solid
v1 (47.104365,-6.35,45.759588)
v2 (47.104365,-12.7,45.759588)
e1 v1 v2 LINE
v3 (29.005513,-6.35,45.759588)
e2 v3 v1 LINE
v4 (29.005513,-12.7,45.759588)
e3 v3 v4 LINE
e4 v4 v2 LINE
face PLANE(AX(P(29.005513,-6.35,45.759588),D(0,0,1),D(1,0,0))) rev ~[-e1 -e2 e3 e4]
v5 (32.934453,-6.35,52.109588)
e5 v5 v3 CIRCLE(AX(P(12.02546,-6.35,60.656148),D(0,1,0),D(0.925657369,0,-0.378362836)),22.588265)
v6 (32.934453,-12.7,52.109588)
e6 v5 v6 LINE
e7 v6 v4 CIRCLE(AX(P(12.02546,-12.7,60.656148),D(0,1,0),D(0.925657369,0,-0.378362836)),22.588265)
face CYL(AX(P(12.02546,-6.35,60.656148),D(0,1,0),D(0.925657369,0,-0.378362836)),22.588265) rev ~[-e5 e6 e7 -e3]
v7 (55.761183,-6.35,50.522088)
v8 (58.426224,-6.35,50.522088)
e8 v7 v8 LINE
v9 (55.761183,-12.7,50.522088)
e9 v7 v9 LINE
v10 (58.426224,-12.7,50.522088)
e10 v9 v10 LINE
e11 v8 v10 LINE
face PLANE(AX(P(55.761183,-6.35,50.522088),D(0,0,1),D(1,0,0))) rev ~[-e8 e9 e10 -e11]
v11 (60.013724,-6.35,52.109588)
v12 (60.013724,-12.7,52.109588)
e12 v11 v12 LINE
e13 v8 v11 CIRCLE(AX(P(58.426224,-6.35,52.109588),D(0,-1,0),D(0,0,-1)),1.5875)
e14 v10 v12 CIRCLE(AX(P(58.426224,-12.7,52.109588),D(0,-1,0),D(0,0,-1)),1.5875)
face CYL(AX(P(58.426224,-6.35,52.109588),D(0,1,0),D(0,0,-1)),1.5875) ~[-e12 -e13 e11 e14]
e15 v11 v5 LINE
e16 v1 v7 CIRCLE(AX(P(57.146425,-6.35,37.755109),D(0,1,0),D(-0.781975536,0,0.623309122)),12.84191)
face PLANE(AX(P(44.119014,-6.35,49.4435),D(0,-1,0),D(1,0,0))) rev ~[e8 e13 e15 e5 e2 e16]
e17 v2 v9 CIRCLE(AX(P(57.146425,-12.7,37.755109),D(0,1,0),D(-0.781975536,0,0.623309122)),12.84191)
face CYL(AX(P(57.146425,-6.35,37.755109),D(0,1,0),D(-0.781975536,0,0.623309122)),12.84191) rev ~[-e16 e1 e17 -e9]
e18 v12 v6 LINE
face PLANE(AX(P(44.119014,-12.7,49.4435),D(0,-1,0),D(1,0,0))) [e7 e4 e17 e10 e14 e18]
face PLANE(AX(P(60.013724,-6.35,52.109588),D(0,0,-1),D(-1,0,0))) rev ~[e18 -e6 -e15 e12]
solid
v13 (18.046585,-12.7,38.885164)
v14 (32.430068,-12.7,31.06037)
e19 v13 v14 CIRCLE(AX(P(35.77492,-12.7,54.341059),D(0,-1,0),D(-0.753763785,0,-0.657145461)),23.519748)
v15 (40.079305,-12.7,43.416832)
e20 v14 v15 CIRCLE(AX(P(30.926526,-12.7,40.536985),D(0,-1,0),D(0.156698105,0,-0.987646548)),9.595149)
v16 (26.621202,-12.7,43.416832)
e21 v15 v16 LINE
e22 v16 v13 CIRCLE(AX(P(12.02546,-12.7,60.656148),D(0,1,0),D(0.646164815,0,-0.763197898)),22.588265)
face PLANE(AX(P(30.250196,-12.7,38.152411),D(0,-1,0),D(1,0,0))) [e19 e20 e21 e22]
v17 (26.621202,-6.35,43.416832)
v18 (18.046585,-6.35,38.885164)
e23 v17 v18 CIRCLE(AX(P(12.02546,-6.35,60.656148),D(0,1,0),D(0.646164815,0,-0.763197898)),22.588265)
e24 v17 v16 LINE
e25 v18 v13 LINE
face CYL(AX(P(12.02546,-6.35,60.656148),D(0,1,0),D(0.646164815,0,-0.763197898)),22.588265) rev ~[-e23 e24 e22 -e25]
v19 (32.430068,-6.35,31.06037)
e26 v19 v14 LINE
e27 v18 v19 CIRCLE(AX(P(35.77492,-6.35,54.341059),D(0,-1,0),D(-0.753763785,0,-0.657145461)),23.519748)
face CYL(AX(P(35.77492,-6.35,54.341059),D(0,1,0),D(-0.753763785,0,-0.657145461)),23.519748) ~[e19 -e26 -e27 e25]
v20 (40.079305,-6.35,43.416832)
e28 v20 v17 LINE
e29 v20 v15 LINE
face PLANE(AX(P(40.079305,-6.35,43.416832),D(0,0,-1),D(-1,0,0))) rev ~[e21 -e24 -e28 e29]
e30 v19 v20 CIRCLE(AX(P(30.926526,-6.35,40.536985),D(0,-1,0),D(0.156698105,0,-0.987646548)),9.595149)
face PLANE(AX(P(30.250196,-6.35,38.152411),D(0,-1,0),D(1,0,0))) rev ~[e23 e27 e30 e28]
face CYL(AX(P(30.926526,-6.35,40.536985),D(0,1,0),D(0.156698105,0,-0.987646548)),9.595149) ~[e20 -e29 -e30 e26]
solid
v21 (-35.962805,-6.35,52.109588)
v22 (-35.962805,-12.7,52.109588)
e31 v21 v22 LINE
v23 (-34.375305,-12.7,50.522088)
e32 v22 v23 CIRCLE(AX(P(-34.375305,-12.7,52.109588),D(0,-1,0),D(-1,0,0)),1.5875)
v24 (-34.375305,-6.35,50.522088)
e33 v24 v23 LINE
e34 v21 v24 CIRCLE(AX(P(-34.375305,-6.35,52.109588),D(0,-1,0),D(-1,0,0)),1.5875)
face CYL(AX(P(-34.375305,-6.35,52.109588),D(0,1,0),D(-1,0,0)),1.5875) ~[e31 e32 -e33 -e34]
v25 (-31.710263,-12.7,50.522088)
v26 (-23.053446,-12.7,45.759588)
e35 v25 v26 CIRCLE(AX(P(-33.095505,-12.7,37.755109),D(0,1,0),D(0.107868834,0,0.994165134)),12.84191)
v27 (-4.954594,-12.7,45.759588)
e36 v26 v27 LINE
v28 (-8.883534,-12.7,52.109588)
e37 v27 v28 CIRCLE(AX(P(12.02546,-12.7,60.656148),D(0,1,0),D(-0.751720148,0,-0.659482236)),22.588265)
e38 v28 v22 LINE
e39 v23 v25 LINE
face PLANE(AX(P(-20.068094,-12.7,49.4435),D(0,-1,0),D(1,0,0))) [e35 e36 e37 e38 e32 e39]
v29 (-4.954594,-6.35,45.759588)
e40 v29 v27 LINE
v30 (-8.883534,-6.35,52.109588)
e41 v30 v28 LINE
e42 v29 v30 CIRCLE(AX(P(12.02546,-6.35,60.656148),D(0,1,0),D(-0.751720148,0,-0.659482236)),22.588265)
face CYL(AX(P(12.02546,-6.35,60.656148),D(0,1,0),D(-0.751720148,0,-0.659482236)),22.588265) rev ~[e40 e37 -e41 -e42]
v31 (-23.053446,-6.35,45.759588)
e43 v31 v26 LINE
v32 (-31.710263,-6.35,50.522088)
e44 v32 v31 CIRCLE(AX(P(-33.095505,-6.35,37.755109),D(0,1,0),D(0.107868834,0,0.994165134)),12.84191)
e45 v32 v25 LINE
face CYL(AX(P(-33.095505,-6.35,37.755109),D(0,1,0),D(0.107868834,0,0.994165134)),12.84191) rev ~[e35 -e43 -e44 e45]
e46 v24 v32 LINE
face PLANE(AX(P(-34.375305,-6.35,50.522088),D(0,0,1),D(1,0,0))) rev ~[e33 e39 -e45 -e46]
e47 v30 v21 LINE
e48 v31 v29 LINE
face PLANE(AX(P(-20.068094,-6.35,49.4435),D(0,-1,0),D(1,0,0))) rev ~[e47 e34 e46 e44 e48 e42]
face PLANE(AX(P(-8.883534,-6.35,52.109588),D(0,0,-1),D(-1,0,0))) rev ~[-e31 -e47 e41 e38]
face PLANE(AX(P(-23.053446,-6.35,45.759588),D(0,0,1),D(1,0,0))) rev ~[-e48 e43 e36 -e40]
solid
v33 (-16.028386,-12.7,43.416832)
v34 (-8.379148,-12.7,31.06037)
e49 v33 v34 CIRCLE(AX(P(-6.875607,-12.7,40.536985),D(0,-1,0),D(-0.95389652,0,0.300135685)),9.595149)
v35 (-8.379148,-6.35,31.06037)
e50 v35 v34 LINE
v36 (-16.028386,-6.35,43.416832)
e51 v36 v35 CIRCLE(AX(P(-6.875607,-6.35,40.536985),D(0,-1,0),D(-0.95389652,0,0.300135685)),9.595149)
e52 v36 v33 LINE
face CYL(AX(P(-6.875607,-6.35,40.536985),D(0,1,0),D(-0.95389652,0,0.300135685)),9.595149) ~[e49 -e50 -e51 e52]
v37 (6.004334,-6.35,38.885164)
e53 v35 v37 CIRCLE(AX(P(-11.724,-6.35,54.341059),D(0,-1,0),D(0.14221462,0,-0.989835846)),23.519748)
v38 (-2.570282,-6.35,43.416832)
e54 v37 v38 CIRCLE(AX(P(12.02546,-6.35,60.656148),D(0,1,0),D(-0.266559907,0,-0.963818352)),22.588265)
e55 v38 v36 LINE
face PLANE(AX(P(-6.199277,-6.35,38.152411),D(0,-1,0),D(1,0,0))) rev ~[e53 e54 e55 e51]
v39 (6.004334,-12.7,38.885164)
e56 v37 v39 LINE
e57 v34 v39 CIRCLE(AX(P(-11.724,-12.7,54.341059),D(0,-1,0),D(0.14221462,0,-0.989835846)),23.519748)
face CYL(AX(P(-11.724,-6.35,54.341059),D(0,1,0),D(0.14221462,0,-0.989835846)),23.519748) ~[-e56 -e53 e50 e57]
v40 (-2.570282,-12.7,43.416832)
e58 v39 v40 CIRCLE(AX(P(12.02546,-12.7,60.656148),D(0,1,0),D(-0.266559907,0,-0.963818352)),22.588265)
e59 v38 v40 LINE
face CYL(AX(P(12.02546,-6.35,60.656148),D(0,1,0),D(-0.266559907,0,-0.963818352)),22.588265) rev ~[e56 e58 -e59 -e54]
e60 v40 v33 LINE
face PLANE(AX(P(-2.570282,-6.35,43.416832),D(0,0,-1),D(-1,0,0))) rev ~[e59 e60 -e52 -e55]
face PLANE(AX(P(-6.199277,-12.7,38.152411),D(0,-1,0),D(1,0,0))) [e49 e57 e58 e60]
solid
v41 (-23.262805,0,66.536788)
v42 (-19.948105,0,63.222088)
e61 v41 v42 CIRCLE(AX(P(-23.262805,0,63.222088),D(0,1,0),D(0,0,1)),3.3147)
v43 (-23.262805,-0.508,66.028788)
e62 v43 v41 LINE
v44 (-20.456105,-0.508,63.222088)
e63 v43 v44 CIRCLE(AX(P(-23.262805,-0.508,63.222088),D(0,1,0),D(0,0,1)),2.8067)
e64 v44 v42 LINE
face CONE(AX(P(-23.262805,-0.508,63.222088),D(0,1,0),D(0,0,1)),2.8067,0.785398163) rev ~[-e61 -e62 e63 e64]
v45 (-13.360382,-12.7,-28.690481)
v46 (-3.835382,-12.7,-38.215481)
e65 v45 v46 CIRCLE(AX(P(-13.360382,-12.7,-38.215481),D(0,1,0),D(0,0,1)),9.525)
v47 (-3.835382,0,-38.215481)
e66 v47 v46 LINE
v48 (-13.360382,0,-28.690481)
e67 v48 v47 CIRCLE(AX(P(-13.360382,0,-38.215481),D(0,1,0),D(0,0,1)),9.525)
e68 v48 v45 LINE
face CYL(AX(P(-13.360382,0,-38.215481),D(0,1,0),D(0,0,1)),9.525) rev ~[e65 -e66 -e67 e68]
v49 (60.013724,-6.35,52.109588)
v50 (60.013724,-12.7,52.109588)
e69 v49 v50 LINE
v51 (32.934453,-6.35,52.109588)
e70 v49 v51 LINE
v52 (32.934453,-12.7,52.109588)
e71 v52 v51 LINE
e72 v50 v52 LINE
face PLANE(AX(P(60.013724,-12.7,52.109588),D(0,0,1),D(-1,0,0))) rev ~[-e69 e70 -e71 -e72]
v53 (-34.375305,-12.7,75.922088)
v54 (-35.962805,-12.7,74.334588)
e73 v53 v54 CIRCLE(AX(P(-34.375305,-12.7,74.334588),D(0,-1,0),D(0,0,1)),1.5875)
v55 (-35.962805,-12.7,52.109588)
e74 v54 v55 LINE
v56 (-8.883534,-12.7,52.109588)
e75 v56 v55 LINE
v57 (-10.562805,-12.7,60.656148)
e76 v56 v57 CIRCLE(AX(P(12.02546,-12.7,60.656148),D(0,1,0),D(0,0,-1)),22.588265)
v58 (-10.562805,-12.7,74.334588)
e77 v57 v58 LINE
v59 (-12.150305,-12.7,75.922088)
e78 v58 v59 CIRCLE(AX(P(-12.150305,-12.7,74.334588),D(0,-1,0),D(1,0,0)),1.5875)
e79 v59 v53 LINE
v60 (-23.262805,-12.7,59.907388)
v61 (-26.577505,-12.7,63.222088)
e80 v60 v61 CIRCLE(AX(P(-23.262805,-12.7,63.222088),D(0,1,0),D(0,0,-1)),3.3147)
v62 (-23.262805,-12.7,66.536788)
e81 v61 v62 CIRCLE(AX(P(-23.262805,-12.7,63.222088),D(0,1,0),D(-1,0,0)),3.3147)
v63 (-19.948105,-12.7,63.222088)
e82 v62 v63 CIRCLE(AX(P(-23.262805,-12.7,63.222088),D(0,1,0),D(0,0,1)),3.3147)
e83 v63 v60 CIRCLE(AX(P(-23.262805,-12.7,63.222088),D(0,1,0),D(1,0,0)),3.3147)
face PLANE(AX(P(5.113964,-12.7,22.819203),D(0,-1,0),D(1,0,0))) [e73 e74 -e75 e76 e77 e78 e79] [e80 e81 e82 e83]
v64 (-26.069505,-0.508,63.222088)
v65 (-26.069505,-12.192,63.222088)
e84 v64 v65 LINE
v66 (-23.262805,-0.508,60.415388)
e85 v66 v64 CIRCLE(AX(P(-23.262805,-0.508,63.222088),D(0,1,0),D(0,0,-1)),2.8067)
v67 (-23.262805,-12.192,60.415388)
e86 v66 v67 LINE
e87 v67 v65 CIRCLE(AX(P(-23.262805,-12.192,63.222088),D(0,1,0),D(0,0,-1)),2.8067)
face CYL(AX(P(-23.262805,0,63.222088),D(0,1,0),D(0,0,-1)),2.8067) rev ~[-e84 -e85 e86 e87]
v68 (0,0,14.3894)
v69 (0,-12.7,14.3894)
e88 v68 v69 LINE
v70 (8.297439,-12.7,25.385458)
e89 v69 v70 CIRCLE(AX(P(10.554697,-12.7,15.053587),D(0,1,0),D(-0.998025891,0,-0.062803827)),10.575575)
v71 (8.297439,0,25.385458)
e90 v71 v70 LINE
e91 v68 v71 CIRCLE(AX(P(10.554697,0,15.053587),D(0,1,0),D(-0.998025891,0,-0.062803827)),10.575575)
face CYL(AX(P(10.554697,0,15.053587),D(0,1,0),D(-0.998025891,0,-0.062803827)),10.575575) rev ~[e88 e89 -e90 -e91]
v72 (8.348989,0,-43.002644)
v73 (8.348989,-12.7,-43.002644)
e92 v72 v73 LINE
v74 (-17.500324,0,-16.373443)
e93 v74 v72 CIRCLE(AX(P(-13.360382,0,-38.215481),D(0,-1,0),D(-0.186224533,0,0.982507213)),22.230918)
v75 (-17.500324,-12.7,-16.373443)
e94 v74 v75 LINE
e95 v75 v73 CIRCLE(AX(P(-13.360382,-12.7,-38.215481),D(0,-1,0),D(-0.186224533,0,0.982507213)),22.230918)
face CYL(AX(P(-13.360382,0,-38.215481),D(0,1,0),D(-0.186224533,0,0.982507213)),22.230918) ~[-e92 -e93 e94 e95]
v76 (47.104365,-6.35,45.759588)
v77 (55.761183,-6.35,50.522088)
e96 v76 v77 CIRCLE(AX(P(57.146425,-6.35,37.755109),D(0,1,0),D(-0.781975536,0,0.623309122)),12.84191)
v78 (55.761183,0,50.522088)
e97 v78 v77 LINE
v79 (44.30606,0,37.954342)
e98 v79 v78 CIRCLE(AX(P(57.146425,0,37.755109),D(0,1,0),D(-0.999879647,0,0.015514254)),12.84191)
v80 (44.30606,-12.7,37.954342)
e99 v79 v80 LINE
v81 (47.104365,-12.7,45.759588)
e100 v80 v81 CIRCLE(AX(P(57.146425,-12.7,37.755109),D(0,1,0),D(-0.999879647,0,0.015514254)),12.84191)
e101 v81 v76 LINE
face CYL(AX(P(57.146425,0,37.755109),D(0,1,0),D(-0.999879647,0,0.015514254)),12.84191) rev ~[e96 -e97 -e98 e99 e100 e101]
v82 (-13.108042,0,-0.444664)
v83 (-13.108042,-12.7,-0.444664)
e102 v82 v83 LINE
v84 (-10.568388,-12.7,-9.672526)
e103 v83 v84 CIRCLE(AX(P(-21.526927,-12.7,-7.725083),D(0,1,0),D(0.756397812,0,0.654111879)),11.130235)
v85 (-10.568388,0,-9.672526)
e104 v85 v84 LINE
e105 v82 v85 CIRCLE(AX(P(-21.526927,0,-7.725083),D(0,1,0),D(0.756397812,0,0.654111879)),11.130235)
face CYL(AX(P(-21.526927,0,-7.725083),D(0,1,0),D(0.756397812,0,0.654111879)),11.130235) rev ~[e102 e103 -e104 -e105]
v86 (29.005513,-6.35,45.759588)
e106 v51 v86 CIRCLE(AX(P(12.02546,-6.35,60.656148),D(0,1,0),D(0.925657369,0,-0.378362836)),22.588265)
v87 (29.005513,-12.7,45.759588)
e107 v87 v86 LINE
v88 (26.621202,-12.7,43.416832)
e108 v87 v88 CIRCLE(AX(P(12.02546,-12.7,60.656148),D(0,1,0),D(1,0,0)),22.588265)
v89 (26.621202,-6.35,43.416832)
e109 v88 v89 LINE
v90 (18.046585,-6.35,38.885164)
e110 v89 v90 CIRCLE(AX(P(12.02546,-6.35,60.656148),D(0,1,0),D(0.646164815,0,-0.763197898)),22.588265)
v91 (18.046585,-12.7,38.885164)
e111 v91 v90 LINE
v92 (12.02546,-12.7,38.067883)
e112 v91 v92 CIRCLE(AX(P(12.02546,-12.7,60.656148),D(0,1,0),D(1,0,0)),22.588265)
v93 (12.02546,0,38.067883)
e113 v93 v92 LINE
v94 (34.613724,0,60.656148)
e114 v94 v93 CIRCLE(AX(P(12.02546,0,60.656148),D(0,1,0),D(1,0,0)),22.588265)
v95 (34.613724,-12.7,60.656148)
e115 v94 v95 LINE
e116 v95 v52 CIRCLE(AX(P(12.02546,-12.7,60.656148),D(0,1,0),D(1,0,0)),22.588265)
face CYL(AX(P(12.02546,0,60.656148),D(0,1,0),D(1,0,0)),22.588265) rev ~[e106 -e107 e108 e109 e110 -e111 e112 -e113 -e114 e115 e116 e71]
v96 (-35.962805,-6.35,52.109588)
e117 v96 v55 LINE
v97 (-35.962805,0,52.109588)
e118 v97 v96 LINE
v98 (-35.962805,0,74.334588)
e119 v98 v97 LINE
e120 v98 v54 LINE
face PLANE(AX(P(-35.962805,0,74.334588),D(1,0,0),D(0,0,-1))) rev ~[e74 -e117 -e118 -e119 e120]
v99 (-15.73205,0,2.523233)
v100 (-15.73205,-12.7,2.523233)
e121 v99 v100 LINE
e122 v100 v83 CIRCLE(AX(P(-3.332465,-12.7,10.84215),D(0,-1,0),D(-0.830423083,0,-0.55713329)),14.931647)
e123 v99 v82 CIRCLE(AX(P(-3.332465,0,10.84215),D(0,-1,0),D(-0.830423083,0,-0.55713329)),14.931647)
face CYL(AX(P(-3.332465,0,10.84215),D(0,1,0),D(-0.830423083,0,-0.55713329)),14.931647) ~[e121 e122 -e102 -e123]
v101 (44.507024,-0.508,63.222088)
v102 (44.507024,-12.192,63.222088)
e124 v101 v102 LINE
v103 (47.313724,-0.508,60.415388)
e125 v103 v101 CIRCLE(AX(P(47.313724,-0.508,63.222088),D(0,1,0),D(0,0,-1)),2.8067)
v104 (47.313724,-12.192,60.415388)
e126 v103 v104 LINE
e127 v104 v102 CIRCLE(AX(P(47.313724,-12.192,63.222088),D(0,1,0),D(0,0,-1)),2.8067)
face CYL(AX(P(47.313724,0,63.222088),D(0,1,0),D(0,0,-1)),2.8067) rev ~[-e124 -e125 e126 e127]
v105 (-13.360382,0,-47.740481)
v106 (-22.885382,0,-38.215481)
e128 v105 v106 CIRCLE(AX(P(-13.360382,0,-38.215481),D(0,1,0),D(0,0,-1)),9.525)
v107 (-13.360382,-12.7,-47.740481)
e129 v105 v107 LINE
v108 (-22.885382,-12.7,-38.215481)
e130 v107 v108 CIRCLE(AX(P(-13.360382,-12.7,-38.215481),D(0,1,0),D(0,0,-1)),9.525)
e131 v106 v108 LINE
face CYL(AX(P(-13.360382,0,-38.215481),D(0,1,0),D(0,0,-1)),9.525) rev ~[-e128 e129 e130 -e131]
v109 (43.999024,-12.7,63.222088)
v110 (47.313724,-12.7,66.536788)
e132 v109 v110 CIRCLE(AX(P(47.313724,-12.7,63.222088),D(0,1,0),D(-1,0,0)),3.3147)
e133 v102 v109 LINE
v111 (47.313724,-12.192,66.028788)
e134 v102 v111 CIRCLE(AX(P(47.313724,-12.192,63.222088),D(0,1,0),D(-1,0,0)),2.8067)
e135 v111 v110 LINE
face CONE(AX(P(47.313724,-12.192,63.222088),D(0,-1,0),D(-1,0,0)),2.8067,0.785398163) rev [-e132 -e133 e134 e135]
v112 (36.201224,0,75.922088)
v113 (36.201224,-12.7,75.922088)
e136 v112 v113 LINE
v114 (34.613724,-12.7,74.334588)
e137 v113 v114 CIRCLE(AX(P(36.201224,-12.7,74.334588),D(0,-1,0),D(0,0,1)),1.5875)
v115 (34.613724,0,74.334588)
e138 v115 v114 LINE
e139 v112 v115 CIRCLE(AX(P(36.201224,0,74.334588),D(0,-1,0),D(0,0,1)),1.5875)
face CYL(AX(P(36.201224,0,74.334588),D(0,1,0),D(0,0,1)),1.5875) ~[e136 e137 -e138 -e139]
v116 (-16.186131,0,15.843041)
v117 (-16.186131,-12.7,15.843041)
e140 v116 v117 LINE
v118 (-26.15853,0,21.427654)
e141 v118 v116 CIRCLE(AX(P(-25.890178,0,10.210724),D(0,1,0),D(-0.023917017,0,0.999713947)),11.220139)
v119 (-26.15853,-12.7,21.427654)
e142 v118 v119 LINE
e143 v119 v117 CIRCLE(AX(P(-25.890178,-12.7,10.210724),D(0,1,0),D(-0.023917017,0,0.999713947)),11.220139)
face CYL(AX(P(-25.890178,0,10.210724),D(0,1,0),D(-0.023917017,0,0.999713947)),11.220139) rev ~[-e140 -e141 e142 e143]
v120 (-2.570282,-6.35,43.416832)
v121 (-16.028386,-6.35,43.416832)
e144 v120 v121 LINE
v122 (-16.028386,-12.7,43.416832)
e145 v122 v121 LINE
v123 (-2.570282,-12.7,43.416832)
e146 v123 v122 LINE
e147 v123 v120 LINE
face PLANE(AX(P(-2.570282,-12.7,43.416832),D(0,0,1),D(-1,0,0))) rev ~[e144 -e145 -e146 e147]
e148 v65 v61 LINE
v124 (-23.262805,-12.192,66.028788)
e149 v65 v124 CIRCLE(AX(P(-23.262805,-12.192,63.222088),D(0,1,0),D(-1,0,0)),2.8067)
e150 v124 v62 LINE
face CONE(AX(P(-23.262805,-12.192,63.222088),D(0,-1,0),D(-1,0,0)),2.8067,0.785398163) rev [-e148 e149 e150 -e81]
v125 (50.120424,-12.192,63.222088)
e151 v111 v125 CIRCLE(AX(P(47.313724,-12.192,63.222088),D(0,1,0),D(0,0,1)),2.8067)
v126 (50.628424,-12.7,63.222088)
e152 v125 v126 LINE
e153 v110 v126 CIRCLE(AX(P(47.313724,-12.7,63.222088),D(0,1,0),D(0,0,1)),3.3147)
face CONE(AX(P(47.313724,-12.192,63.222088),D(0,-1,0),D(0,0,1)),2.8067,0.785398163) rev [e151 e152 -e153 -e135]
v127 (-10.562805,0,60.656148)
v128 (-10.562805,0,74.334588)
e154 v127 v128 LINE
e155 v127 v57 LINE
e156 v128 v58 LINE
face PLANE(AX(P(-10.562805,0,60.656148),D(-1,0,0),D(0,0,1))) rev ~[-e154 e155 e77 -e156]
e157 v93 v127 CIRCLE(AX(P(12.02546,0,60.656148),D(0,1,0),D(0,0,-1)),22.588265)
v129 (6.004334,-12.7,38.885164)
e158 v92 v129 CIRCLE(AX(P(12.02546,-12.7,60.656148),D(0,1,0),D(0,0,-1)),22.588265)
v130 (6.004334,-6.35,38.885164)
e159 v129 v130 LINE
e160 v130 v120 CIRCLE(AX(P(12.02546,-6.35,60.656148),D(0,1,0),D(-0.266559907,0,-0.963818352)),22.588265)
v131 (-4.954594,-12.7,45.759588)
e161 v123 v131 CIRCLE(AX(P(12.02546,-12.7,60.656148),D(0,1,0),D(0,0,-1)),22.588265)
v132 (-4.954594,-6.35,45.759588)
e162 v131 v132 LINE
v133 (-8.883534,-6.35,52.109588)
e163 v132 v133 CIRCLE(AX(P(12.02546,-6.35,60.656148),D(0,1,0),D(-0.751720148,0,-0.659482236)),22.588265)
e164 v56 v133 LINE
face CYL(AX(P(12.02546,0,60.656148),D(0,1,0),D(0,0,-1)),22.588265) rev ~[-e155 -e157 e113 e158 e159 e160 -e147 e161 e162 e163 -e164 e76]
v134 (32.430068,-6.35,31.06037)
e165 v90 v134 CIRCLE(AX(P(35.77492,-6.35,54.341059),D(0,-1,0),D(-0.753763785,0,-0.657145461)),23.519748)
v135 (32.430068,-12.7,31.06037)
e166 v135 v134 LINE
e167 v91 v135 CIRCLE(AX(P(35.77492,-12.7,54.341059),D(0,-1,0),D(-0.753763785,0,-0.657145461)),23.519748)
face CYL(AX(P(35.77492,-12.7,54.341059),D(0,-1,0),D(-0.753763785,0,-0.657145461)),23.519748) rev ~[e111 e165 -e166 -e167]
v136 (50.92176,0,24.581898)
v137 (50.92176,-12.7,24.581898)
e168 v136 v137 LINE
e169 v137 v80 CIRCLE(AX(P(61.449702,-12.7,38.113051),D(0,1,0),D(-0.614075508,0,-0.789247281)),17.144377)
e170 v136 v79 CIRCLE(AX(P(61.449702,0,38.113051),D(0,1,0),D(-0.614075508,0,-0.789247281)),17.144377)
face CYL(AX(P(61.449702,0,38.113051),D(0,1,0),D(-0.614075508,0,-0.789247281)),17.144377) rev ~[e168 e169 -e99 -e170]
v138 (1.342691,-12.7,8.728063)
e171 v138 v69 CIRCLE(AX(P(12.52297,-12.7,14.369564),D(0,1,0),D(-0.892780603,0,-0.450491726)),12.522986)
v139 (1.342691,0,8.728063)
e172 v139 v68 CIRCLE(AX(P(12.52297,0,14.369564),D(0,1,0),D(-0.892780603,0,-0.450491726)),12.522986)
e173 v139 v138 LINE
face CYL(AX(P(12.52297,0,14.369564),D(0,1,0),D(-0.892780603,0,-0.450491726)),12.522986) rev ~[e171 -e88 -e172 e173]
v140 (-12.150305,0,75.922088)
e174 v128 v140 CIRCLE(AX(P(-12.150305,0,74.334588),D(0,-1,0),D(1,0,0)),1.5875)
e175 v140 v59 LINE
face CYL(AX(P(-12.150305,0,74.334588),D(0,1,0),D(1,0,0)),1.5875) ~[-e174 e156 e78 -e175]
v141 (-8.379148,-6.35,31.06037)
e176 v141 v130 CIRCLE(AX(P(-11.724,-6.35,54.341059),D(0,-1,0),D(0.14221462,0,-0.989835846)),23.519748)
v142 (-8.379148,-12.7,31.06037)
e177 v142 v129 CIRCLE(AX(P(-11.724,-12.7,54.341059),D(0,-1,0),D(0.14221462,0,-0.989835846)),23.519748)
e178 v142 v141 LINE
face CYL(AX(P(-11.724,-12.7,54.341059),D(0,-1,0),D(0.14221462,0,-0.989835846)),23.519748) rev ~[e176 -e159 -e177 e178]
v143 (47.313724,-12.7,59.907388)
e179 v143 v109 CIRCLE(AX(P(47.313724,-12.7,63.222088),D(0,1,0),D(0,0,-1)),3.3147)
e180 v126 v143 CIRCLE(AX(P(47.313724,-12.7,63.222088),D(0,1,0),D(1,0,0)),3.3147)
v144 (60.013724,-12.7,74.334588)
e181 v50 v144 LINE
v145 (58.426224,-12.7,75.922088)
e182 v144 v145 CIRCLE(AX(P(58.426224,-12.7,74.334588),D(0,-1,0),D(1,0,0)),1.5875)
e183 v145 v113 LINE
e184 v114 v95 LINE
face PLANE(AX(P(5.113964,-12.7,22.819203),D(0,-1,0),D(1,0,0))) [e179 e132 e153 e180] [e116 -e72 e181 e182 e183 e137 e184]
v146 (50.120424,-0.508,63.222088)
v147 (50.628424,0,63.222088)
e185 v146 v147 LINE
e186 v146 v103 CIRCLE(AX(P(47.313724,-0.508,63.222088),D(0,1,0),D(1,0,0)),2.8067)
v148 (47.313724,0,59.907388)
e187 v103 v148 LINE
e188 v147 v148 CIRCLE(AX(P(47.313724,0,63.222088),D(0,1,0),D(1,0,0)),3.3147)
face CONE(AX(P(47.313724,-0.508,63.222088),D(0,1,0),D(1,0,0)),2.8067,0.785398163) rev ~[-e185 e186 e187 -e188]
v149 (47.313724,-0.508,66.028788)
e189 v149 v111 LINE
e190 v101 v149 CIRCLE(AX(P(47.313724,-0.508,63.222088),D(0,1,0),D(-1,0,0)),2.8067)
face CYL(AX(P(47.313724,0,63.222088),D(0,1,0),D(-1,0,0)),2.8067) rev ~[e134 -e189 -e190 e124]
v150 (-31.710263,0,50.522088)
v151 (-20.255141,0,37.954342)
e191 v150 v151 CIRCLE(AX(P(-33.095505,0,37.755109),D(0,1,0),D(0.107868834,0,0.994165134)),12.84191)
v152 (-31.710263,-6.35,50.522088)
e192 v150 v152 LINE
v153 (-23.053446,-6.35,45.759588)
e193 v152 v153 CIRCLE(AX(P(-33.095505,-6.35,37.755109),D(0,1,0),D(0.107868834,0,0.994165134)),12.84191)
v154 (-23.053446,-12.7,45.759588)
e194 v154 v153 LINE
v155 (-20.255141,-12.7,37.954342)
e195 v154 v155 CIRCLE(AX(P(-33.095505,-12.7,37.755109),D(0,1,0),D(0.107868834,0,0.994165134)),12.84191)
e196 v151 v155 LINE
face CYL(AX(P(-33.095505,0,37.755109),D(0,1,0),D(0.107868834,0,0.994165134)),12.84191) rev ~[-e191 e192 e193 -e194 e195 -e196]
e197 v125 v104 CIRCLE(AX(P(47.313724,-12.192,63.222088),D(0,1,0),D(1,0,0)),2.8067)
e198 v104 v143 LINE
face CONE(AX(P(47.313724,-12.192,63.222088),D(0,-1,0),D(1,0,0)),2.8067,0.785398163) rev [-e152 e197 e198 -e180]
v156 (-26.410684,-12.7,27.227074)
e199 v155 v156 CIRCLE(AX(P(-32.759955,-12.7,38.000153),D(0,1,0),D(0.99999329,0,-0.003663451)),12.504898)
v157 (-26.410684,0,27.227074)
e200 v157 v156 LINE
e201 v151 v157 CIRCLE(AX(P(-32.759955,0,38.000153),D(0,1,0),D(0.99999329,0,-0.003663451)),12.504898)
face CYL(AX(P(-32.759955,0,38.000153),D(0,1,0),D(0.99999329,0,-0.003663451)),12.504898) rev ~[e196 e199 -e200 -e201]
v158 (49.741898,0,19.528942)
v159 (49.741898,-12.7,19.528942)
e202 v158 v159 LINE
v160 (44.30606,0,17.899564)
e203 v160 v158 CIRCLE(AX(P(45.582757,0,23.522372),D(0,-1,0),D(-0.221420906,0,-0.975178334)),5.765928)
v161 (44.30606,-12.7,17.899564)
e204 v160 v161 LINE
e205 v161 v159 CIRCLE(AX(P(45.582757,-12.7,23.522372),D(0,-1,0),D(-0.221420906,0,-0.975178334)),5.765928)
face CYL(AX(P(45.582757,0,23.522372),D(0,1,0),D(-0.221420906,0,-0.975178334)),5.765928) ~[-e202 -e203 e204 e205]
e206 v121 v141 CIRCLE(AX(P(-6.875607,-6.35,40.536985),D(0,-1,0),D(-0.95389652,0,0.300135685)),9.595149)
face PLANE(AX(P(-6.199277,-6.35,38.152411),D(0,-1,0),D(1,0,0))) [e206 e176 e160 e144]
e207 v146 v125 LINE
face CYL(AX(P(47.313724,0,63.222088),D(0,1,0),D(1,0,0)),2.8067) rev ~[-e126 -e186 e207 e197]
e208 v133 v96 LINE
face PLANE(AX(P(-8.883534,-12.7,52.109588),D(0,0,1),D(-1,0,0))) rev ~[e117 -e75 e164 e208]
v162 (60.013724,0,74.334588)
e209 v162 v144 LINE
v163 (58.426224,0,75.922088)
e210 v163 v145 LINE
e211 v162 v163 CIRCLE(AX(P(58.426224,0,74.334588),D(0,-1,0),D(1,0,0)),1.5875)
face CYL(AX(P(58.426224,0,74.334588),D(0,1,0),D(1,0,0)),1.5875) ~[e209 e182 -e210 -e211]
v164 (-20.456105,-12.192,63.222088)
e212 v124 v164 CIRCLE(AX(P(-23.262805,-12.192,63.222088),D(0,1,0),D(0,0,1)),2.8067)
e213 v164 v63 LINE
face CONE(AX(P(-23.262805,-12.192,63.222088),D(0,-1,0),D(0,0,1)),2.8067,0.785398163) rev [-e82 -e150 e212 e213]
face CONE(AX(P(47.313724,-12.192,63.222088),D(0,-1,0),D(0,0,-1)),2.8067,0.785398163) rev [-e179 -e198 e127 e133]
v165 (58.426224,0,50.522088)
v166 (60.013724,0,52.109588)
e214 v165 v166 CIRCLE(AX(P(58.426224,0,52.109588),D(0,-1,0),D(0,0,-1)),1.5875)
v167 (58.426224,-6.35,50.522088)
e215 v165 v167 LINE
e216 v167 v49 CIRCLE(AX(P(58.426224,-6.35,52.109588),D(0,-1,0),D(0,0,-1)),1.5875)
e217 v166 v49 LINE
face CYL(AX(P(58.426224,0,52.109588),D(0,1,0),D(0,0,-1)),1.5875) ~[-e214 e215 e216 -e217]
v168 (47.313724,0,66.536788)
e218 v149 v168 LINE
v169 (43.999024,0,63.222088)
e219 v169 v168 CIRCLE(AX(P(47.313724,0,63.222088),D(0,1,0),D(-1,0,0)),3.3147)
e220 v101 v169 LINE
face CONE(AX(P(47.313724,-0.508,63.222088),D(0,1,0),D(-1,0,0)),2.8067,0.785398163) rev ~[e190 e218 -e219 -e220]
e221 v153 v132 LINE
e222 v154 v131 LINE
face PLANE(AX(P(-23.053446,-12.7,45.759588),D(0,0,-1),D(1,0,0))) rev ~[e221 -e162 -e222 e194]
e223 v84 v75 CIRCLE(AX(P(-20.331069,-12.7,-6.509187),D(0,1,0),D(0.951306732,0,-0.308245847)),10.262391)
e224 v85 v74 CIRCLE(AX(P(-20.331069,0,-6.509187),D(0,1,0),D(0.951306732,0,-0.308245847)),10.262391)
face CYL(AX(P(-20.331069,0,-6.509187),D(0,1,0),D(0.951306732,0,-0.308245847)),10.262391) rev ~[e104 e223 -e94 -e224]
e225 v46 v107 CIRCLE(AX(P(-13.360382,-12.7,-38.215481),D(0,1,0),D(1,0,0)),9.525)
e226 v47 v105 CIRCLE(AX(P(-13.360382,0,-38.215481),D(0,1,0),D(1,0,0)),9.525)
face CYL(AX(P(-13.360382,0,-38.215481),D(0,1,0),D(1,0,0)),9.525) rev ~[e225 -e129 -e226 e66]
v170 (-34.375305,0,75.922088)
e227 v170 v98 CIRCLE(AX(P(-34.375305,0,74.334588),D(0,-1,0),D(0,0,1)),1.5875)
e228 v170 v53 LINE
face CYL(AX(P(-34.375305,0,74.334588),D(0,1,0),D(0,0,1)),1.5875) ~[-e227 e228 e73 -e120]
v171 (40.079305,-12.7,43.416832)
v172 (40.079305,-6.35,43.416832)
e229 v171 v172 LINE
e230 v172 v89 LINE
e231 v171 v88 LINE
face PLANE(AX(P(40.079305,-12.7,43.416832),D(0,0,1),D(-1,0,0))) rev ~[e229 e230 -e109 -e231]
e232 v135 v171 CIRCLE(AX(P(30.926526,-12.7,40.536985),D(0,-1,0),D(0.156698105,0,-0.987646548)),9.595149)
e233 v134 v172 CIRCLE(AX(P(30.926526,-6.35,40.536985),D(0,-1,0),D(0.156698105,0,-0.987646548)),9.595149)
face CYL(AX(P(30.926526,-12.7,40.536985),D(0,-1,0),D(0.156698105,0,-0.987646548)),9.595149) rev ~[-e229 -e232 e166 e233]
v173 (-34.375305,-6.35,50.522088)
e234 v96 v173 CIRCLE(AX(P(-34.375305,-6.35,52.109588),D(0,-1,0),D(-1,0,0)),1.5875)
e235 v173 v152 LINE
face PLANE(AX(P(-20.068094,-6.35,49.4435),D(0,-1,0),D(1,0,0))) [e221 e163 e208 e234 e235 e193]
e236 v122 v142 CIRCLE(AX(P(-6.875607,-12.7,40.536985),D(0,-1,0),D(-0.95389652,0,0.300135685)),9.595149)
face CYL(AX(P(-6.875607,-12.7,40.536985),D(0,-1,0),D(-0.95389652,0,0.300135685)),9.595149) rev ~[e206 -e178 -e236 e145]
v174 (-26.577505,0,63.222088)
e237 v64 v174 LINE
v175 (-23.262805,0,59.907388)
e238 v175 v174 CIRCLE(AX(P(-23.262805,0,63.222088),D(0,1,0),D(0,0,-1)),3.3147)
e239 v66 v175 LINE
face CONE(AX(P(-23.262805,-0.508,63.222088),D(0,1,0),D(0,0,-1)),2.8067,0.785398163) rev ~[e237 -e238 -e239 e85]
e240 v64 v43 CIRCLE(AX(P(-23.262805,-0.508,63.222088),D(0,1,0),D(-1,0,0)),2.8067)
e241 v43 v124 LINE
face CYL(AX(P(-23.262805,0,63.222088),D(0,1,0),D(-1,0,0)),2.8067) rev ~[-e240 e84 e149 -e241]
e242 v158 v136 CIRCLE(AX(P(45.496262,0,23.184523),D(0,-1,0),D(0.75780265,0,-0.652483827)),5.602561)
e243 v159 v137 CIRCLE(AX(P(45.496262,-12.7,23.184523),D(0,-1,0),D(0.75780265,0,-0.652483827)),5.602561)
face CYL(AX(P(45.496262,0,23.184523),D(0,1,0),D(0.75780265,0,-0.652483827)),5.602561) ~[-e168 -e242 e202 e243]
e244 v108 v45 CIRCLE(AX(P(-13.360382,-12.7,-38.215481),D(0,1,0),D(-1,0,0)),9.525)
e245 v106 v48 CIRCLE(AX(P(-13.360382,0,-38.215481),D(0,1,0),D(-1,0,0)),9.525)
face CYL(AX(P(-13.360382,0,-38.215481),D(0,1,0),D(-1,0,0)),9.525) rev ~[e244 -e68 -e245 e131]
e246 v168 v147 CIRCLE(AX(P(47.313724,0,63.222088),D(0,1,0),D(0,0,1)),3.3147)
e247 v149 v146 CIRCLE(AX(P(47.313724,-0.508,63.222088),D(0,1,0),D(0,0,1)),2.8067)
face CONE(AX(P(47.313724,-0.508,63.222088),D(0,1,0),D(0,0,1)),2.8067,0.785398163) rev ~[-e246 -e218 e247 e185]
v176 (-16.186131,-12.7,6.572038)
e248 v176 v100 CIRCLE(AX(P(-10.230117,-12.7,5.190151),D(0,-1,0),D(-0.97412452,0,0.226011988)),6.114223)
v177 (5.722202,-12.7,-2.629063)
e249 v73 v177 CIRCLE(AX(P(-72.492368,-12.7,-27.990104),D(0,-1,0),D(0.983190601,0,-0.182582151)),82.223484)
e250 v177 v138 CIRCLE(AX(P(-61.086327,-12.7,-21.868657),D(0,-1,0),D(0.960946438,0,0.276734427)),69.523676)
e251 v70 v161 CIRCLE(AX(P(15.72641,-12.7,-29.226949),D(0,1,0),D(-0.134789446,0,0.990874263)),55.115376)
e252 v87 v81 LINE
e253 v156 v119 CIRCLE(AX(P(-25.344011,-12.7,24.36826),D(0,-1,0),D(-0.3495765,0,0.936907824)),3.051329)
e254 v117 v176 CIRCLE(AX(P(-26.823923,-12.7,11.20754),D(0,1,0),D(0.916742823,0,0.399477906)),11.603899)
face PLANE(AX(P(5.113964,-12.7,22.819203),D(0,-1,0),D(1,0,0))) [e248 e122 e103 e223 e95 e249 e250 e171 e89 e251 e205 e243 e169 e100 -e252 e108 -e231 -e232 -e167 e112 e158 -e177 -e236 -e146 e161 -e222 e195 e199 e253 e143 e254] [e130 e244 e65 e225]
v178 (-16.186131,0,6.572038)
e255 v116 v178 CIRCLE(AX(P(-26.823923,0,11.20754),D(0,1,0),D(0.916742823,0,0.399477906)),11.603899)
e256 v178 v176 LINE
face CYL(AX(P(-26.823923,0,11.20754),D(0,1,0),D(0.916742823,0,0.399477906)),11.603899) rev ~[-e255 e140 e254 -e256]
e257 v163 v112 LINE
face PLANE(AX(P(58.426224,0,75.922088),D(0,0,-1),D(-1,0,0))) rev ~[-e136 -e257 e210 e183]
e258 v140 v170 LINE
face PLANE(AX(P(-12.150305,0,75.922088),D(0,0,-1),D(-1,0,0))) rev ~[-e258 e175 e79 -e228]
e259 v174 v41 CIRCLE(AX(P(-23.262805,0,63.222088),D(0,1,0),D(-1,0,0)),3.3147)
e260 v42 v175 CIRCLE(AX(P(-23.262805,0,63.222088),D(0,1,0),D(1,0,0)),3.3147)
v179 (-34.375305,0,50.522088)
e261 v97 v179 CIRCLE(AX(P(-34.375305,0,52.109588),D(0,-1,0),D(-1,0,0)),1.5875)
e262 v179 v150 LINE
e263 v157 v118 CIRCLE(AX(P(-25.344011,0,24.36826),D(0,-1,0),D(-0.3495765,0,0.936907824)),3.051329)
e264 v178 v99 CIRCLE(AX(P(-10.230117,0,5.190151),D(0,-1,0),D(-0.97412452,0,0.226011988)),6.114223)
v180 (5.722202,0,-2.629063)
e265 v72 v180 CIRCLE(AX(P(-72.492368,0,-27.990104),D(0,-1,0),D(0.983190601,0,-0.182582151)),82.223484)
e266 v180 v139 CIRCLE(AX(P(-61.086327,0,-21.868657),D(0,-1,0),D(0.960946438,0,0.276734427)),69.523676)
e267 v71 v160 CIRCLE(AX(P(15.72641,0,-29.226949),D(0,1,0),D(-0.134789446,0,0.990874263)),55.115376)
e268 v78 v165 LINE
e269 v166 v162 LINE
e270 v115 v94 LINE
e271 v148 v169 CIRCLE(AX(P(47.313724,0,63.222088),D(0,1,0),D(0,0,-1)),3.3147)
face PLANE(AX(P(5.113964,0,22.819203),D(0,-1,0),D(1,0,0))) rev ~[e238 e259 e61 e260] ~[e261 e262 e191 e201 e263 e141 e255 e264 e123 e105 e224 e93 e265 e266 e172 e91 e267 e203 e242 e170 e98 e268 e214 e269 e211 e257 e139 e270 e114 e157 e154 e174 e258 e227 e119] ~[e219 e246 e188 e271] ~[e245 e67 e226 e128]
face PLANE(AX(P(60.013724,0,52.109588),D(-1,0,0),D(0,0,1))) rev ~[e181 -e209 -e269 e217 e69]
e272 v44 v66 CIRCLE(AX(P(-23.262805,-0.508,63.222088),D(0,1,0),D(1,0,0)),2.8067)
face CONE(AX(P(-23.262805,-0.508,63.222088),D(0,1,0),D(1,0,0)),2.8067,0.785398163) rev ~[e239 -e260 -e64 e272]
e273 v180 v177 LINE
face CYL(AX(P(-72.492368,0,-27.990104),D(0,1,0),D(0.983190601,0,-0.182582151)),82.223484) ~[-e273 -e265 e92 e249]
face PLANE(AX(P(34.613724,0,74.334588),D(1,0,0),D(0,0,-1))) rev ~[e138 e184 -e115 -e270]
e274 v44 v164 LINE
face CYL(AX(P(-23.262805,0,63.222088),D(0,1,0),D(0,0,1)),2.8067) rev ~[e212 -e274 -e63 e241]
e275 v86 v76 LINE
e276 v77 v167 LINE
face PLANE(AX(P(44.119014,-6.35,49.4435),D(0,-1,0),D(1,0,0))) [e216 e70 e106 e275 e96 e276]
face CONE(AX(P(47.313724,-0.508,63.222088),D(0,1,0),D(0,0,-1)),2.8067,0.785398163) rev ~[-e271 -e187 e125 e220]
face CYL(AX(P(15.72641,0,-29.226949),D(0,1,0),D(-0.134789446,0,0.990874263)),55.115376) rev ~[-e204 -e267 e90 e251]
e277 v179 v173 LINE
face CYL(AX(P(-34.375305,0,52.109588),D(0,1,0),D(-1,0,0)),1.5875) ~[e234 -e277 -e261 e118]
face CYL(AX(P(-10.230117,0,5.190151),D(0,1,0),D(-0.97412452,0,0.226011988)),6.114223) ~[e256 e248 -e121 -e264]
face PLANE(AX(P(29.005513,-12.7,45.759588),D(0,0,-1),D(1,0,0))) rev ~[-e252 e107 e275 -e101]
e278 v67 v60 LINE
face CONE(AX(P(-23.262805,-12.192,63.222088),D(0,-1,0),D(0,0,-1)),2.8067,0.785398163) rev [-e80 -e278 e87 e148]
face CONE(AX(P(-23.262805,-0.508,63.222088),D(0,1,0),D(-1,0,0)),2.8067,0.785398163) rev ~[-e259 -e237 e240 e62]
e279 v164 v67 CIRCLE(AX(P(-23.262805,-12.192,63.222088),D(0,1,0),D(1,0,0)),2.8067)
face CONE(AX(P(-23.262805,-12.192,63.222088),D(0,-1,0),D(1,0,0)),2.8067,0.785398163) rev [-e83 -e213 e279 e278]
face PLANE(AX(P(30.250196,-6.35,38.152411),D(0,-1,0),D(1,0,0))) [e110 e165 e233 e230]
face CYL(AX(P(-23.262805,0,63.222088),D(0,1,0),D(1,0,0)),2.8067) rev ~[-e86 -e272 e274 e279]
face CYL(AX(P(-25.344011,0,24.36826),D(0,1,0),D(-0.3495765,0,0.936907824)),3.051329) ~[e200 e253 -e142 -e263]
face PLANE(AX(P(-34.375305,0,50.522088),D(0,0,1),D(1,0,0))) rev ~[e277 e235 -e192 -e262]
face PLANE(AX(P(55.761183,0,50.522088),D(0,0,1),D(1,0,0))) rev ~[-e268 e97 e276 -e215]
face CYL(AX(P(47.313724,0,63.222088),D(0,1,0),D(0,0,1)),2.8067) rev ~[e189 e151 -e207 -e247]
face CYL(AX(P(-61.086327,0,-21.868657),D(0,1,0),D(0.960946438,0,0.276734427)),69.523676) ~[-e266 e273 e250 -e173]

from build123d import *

# Parameters (mm, degrees)
F1_DEPTH = 12.7
F2_SIZE  = 0.508
F4_DEPTH = 6.35
F5_DEPTH = 6.35


with BuildPart() as f1:
    # F0 (on Front) → F1 (new body)
    with BuildSketch(Plane.XZ):
        with BuildLine():
            Line((-35.9628051519, 74.3345879376), (-35.9628051519, 52.1095879376))
            ThreePointArc((-35.9628051519, 52.1095879376), (-35.4978371671, 50.9870559225), (-34.3753051519, 50.5220879376))
            Line((-34.3753051519, 50.5220879376), (-31.7102633417, 50.5220879376))
            ThreePointArc((-31.7102633417, 50.5220879376), (-23.6045079295, 46.4058672096), (-20.2551409602, 37.9543416202))
            ThreePointArc((-20.2551409602, 37.9543416202), (-21.9138635475, 31.7764261625), (-26.4106839895, 27.2270739079))
            ThreePointArc((-26.4106839895, 27.2270739079), (-28.3924598426, 24.2357162237), (-26.1585302651, 21.4276537299))
            ThreePointArc((-26.1585302651, 21.4276537299), (-20.4079287218, 20.0003341812), (-16.1861311644, 15.8430412412))
            ThreePointArc((-16.1861311644, 15.8430412412), (-15.2200232553, 11.207539821), (-16.1861311644, 6.5720384009))
            ThreePointArc((-16.1861311644, 6.5720384009), (-16.3062460987, 4.5087014073), (-15.732049942, 2.5232327171))
            ThreePointArc((-15.732049942, 2.5232327171), (-14.5189102199, 0.951875362), (-13.1080421386, -0.4446643545))
            ThreePointArc((-13.1080421386, -0.4446643545), (-10.795687591, -4.7716751996), (-10.5683878064, -9.6725262702))
            ThreePointArc((-10.5683878064, -9.6725262702), (-13.1984563019, -13.8877028461), (-17.5003244607, -16.3734430181))
            ThreePointArc((-17.5003244607, -16.3734430181), (-29.3118646244, -53.699793422), (8.3489892293, -43.002644151))
            ThreePointArc((8.3489892293, -43.002644151), (9.557638386, -22.651764197), (5.7222023606, -2.6290626265))
            ThreePointArc((5.7222023606, -2.6290626265), (3.7814770492, 3.1455305799), (1.3426912483, 8.728062734))
            ThreePointArc((1.3426912483, 8.728062734), (0.3379920997, 11.4796705796), (0, 14.3894003704))
            ThreePointArc((0, 14.3894003704), (2.1128447305, 21.423665691), (8.2974387333, 25.3854580224))
            ThreePointArc((8.2974387333, 25.3854580224), (26.9445854097, 24.7346775815), (44.3060602993, 17.899563536))
            ThreePointArc((44.3060602993, 17.899563536), (47.2383051728, 17.9992305099), (49.741897732, 19.5289421827))
            ThreePointArc((49.741897732, 19.5289421827), (50.952066256, 21.9105950176), (50.9217604995, 24.5818980038))
            ThreePointArc((50.9217604995, 24.5818980038), (46.0830273259, 30.5107516192), (44.3060602993, 37.9543416202))
            ThreePointArc((44.3060602993, 37.9543416202), (47.6554272686, 46.4058672096), (55.7611826807, 50.5220879376))
            Line((55.7611826807, 50.5220879376), (58.426224491, 50.5220879376))
            ThreePointArc((58.426224491, 50.5220879376), (59.5487565061, 50.9870559225), (60.013724491, 52.1095879376))
            Line((60.013724491, 52.1095879376), (60.013724491, 74.3345879376))
            ThreePointArc((60.013724491, 74.3345879376), (59.5487565061, 75.4571199527), (58.426224491, 75.9220879376))
            Line((58.426224491, 75.9220879376), (36.201224491, 75.9220879376))
            ThreePointArc((36.201224491, 75.9220879376), (35.0786924759, 75.4571199527), (34.613724491, 74.3345879376))
            Line((34.613724491, 74.3345879376), (34.613724491, 60.6561478734))
            ThreePointArc((34.613724491, 60.6561478734), (27.9977749, 44.6838326429), (12.0254596695, 38.0678830519))
            ThreePointArc((12.0254596695, 38.0678830519), (-3.946855561, 44.6838326429), (-10.5628051519, 60.6561478734))
            Line((-10.5628051519, 60.6561478734), (-10.5628051519, 74.3345879376))
            ThreePointArc((-10.5628051519, 74.3345879376), (-11.0277731368, 75.4571199527), (-12.1503051519, 75.9220879376))
            Line((-12.1503051519, 75.9220879376), (-34.3753051519, 75.9220879376))
            ThreePointArc((-34.3753051519, 75.9220879376), (-35.4978371671, 75.4571199527), (-35.9628051519, 74.3345879376))
        make_face()
        with BuildLine():
            ThreePointArc((-13.3603820577, -28.6904807448), (-6.6251899669, -31.480288654), (-3.8353820577, -38.2154807448))
            ThreePointArc((-3.8353820577, -38.2154807448), (-6.6251899669, -44.9506728356), (-13.3603820577, -47.7404807448))
            ThreePointArc((-13.3603820577, -47.7404807448), (-20.0955741485, -44.9506728356), (-22.8853820577, -38.2154807448))
            ThreePointArc((-22.8853820577, -38.2154807448), (-20.0955741485, -31.480288654), (-13.3603820577, -28.6904807448))
        make_face(mode=Mode.SUBTRACT)
        with BuildLine():
            ThreePointArc((-20.4561051519, 63.2220879376), (-21.2781685492, 61.2374513348), (-23.2628051519, 60.4153879376))
            ThreePointArc((-23.2628051519, 60.4153879376), (-25.2474417547, 61.2374513348), (-26.0695051519, 63.2220879376))
            ThreePointArc((-26.0695051519, 63.2220879376), (-25.2474417547, 65.2067245403), (-23.2628051519, 66.0287879376))
            ThreePointArc((-23.2628051519, 66.0287879376), (-21.2781685492, 65.2067245403), (-20.4561051519, 63.2220879376))
        make_face(mode=Mode.SUBTRACT)
        with BuildLine():
            ThreePointArc((47.313724491, 66.0287879376), (49.2983610938, 65.2067245403), (50.120424491, 63.2220879376))
            ThreePointArc((50.120424491, 63.2220879376), (49.2983610938, 61.2374513348), (47.313724491, 60.4153879376))
            ThreePointArc((47.313724491, 60.4153879376), (45.3290878882, 61.2374513348), (44.507024491, 63.2220879376))
            ThreePointArc((44.507024491, 63.2220879376), (45.3290878882, 65.2067245403), (47.313724491, 66.0287879376))
        make_face(mode=Mode.SUBTRACT)
    extrude(amount=F1_DEPTH)

    # F2
    f2_edges = [f1.edges().sort_by_distance(p)[0] for p in [
        (-23.262805, -12.7, 60.415388),
        (47.313724, -12.7, 66.028788),
        (47.313724, 0, 66.028788),
        (-23.262805, 0, 60.415388),
    ]]
    chamfer(f2_edges, length=F2_SIZE)

    # F3 (on face) → F4 (cut)
    with BuildSketch(Plane.XZ.offset(12.7)):
        with BuildLine():
            Line((-8.8835341109, 52.1095879376), (-35.9628051519, 52.1095879376))
            ThreePointArc((-35.9628051519, 52.1095879376), (-35.4978371671, 50.9870559225), (-34.3753051519, 50.5220879376))
            Line((-34.3753051519, 50.5220879376), (-31.7102633417, 50.5220879376))
            ThreePointArc((-31.7102633417, 50.5220879376), (-26.9055008974, 49.0067085852), (-23.0534458939, 45.75958848))
            Line((-23.0534458939, 45.75958848), (-4.9545940961, 45.75958848))
            ThreePointArc((-4.9545940961, 45.75958848), (-7.1832780366, 48.7711109201), (-8.8835341109, 52.1095879376))
        make_face()
        with BuildLine():
            Line((60.013724491, 52.1095879376), (32.9344534499, 52.1095879376))
            ThreePointArc((32.9344534499, 52.1095879376), (31.2341973757, 48.7711109201), (29.0055134352, 45.75958848))
            Line((29.0055134352, 45.75958848), (47.104365233, 45.75958848))
            ThreePointArc((47.104365233, 45.75958848), (50.9564202365, 49.0067085852), (55.7611826807, 50.5220879376))
            Line((55.7611826807, 50.5220879376), (58.426224491, 50.5220879376))
            ThreePointArc((58.426224491, 50.5220879376), (59.5487565061, 50.9870559225), (60.013724491, 52.1095879376))
        make_face()
        with BuildLine():
            Line((40.0793049484, 43.4168316424), (26.6212016353, 43.4168316424))
            ThreePointArc((26.6212016353, 43.4168316424), (22.5799758765, 40.6853718424), (18.0465854352, 38.8851636936))
            ThreePointArc((18.0465854352, 38.8851636936), (24.5354070051, 33.6806648499), (32.4300676584, 31.0603696853))
            ThreePointArc((32.4300676584, 31.0603696853), (39.084946833, 35.4865348655), (40.0793049484, 43.4168316424))
        make_face()
        with BuildLine():
            ThreePointArc((6.0043339039, 38.8851636936), (1.4709434626, 40.6853718424), (-2.5702822963, 43.4168316424))
            Line((-2.5702822963, 43.4168316424), (-16.0283856094, 43.4168316424))
            ThreePointArc((-16.0283856094, 43.4168316424), (-15.0340274939, 35.4865348655), (-8.3791483194, 31.0603696853))
            ThreePointArc((-8.3791483194, 31.0603696853), (-0.4844876661, 33.6806648499), (6.0043339039, 38.8851636936))
        make_face()
    extrude(amount=-F4_DEPTH, mode=Mode.SUBTRACT)


with BuildPart() as f5:
    # F5 (new): a face of the model
    f5_faces = [f1.part.faces().sort_by_distance(p)[0] for p in [
        (-18.2506791882, -6.35, 49.2131238692),
    ]]
    extrude(f5_faces, amount=F5_DEPTH)


with BuildPart() as f5b:
    # F5#2 (new): a face of the model
    f5_2_faces = [f1.part.faces().sort_by_distance(p)[0] for p in [
        (42.3015985272, -6.35, 49.2131238692),
    ]]
    extrude(f5_2_faces, amount=F5_DEPTH)


with BuildPart() as f5c:
    # F5#3 (new): a face of the model
    f5_3_faces = [f1.part.faces().sort_by_distance(p)[0] for p in [
        (-6.7748141706, -6.35, 37.8823444138),
    ]]
    extrude(f5_3_faces, amount=F5_DEPTH)


with BuildPart() as f5d:
    # F5#4 (new): a face of the model
    f5_4_faces = [f1.part.faces().sort_by_distance(p)[0] for p in [
        (30.8257335097, -6.35, 37.8823444138),
    ]]
    extrude(f5_4_faces, amount=F5_DEPTH)


solid = Compound([f1.part, f5.part, f5b.part, f5c.part, f5d.part])
